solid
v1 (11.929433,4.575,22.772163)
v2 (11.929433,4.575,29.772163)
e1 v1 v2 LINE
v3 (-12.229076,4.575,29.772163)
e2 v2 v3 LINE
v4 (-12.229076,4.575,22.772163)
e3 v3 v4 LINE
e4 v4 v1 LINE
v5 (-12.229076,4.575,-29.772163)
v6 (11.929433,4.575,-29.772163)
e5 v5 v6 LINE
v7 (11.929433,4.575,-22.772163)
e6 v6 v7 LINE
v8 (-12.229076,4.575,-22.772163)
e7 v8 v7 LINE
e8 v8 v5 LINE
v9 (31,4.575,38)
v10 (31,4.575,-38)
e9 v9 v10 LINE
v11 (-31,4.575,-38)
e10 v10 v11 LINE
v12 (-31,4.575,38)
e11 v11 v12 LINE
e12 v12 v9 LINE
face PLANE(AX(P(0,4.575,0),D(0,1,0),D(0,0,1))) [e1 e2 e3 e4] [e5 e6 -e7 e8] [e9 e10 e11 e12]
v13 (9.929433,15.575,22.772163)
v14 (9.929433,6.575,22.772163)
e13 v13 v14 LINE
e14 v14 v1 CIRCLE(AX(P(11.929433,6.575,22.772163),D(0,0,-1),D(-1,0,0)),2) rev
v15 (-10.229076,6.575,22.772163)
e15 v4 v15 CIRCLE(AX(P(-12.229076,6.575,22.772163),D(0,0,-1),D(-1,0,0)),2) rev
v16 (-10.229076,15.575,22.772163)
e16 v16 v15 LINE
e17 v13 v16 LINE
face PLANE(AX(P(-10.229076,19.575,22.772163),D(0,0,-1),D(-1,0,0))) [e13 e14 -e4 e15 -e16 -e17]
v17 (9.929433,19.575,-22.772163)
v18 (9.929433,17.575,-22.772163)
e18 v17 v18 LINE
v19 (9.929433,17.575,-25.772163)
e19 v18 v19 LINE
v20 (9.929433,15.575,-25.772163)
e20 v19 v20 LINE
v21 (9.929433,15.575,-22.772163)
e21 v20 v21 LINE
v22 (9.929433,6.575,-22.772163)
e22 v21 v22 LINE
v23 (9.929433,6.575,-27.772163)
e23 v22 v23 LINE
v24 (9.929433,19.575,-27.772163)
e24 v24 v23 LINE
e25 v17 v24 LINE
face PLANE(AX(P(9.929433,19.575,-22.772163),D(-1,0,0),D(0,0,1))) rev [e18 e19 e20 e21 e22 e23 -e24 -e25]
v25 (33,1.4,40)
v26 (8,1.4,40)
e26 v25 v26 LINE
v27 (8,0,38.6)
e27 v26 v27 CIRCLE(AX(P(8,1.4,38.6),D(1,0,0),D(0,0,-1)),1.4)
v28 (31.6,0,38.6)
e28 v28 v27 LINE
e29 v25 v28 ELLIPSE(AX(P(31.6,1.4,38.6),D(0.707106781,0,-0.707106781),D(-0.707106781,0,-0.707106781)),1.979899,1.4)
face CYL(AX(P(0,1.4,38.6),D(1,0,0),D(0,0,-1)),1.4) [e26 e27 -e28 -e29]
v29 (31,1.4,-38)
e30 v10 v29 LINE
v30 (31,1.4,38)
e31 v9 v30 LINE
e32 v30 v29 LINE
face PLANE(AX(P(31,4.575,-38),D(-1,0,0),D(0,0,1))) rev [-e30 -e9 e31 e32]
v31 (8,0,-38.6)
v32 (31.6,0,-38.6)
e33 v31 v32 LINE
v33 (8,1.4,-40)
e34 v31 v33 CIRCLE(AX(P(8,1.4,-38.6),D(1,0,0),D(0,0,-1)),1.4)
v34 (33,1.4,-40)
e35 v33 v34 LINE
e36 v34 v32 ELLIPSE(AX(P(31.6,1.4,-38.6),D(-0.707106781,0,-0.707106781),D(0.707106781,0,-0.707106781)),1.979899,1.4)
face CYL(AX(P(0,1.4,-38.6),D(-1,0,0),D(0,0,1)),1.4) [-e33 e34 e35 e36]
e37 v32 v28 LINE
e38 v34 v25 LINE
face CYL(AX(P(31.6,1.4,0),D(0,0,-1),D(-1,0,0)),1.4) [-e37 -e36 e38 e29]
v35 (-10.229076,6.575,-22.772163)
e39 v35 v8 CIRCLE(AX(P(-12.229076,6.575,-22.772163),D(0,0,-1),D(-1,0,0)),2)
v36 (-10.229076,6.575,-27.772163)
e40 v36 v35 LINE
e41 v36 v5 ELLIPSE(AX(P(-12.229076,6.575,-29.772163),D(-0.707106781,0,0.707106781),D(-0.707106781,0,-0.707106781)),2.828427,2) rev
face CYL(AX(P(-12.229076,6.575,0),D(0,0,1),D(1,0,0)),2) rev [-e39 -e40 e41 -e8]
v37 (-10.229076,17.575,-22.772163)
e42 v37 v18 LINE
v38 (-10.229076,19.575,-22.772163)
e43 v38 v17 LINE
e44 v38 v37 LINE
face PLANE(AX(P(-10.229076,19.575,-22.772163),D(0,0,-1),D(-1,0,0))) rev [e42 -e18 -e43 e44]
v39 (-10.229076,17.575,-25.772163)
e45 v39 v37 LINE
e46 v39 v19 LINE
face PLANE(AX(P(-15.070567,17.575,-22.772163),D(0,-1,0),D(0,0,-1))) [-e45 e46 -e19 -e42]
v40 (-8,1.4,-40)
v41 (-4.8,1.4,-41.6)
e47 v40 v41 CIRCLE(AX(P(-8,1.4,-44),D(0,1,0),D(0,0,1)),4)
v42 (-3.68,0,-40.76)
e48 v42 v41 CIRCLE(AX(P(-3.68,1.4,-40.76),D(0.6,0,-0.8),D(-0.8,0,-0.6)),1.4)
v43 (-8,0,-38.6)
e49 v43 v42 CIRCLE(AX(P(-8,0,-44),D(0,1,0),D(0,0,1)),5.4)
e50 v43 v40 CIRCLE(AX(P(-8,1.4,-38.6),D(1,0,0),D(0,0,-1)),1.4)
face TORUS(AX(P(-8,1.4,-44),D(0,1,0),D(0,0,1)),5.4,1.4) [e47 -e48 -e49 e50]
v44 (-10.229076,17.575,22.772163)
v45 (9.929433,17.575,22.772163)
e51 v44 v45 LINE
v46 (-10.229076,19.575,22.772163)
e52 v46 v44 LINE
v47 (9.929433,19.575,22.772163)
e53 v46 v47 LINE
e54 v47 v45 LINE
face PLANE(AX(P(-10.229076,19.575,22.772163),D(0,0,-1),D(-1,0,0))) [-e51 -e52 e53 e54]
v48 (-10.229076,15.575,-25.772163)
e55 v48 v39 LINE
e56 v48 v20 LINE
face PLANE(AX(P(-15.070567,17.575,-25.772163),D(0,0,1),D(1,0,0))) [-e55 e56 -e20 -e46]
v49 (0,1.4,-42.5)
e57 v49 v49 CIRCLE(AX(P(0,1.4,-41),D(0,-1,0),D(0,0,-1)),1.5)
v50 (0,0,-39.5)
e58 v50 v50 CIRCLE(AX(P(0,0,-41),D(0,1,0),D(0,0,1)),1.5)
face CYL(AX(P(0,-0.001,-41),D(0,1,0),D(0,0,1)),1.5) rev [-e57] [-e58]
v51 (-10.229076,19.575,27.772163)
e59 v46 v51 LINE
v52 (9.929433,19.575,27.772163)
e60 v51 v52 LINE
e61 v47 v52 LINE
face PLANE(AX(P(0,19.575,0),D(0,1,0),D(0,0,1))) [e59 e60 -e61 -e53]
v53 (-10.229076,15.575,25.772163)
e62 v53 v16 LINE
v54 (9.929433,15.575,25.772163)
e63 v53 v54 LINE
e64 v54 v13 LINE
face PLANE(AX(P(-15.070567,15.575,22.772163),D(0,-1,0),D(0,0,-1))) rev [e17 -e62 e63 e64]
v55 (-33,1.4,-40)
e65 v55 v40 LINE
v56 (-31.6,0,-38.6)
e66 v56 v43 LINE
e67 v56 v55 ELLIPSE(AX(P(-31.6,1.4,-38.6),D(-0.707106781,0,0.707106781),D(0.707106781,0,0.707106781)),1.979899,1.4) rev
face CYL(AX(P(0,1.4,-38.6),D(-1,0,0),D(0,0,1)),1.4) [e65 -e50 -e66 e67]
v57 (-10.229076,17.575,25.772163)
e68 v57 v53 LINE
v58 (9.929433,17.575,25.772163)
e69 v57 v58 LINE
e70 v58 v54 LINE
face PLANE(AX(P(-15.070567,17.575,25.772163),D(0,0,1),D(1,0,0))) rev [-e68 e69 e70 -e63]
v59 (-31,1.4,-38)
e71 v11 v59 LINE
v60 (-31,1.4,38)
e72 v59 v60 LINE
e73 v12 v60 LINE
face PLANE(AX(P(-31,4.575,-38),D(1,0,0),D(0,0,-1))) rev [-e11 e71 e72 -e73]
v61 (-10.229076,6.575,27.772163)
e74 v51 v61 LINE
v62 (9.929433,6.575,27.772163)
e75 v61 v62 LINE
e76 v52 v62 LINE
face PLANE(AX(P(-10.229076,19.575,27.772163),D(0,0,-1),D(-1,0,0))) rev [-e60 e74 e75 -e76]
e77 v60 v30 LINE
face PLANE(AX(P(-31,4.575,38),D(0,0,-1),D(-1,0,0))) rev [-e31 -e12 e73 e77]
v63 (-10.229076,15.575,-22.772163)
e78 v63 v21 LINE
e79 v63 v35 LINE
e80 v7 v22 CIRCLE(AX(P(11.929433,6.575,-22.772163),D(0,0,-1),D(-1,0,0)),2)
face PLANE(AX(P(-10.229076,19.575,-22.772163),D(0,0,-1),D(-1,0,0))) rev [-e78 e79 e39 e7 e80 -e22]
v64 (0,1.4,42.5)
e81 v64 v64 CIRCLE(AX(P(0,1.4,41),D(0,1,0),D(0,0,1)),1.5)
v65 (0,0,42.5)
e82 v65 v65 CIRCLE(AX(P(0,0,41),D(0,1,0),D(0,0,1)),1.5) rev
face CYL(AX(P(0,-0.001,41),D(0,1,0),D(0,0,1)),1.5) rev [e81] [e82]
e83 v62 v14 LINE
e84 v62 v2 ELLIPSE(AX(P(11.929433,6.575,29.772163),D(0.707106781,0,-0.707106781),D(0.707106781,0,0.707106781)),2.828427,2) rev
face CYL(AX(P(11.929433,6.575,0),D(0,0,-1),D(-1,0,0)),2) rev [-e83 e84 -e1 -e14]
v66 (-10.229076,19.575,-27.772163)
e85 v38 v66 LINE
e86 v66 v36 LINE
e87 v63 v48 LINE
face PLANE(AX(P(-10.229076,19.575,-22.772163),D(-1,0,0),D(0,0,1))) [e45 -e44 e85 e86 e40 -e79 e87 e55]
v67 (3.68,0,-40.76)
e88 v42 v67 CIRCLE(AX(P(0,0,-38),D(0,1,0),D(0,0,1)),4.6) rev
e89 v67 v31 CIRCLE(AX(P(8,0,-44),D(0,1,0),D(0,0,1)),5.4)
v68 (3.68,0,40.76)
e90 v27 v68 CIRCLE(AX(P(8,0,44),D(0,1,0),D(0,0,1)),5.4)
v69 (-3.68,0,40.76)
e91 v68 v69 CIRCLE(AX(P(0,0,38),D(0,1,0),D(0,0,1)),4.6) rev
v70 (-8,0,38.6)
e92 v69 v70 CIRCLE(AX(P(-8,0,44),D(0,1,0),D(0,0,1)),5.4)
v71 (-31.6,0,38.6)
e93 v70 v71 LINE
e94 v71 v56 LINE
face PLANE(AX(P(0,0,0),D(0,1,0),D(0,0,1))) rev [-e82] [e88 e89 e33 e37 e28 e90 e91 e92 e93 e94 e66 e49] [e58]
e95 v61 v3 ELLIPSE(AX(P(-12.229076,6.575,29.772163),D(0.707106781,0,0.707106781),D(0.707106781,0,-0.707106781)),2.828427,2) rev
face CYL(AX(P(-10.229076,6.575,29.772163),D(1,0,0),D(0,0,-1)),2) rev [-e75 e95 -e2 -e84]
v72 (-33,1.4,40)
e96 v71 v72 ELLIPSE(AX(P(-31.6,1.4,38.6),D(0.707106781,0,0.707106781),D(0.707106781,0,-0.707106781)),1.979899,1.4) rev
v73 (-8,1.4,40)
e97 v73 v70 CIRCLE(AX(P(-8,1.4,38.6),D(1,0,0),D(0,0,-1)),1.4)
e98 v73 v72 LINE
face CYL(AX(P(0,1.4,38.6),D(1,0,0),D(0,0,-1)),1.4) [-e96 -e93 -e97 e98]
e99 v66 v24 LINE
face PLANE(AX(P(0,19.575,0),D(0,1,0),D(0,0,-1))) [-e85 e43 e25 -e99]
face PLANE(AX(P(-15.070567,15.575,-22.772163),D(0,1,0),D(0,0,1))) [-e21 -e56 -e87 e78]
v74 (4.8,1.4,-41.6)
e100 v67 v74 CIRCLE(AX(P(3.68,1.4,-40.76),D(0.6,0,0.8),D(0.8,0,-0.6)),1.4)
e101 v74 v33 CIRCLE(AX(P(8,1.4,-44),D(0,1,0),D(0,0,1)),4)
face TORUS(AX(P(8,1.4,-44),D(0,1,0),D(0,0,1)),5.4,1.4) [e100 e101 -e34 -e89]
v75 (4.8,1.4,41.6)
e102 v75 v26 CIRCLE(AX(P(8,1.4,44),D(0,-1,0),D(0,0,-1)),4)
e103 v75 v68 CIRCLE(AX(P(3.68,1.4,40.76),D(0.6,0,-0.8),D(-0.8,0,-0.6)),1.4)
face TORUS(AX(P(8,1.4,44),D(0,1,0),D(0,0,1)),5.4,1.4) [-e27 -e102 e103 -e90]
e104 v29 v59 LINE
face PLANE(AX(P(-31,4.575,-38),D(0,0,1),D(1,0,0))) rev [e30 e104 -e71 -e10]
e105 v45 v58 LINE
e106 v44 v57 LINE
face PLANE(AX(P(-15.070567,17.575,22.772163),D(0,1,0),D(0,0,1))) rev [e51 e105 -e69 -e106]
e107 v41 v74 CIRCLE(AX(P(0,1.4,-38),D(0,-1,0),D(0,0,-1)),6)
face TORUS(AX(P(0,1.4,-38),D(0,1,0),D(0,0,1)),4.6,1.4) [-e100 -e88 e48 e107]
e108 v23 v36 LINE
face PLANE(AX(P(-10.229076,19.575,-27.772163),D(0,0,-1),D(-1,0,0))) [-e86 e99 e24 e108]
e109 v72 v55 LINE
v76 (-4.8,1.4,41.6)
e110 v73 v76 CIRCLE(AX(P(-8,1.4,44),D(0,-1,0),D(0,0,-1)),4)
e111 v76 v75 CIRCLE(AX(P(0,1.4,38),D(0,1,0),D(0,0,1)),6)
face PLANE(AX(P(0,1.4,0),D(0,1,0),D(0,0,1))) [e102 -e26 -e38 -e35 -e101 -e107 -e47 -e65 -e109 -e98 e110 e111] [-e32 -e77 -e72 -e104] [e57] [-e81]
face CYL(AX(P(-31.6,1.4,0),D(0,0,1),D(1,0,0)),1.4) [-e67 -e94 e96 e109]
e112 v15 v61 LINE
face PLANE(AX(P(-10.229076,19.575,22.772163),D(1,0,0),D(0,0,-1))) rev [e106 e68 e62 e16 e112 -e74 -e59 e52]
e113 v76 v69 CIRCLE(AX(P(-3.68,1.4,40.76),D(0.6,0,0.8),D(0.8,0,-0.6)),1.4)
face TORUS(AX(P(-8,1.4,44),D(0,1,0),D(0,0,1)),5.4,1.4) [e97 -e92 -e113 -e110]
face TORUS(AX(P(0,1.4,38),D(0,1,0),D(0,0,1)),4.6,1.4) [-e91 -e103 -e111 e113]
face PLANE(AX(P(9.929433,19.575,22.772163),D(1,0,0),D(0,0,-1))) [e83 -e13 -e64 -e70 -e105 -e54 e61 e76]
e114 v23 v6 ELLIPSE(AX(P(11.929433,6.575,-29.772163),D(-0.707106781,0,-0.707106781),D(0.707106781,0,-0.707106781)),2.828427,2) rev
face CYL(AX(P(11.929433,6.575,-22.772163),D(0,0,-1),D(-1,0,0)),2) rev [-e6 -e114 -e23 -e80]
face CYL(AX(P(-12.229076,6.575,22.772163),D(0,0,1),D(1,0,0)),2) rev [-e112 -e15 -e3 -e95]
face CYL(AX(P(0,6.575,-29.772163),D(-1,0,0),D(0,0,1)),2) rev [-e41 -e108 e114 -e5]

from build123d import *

# Parameters (mm, degrees)
SKETCH1_W           = 62
SKETCH1_H           = 76
BOSS_EXTRUDE1_DEPTH = 4.575
SKETCH11_W          = 66
SKETCH11_H          = 80
BOSS_EXTRUDE5_DEPTH = 1.4
BOSS_EXTRUDE3_DEPTH = 1.4
CUT_EXTRUDE3_REACH  = 57.092
SKETCH12_R          = 1.5
FILLET1_R           = 1.4
SKETCH21_W          = 20.158508521
SKETCH21_H          = 5
BOSS_EXTRUDE8_DEPTH = 15
SKETCH33_W          = 3
SKETCH33_H          = 2
CUT_EXTRUDE7_DEPTH  = 25
FILLET2_R           = 2


with BuildPart() as part:
    # Sketch1 → Boss-Extrude1 (new body)
    with BuildSketch(Plane(origin=(0, 0, 0), x_dir=(1, 0, 0), z_dir=(0, 1, 0))):
        Rectangle(SKETCH1_W, SKETCH1_H)
    extrude(amount=BOSS_EXTRUDE1_DEPTH)

    # Sketch11 → Boss-Extrude5 (add)
    with BuildSketch(Plane(origin=(0, 0, 0), x_dir=(-1, 0, 0), z_dir=(0, -1, 0))):
        Rectangle(SKETCH11_W, SKETCH11_H)
    extrude(amount=-BOSS_EXTRUDE5_DEPTH)

    # Sketch4 → Boss-Extrude3 (add)
    with BuildSketch(Plane(origin=(0, 0, 0), x_dir=(1, 0, 0), z_dir=(0, 1, 0))):
        with BuildLine():
            Line((-8, -40), (8, -40))
            ThreePointArc((8, -40), (6.211145618, -40.422291236), (4.8, -41.6))
            ThreePointArc((4.8, -41.6), (0, -44), (-4.8, -41.6))
            ThreePointArc((-4.8, -41.6), (-6.211145618, -40.422291236), (-8, -40))
        make_face()
    boss_extrude3 = extrude(amount=BOSS_EXTRUDE3_DEPTH)

    # Sketch12 → Cut-Extrude3 (cut, up to next)
    with BuildSketch(Plane(origin=(0, 1.4, 0), x_dir=(1, 0, 0), z_dir=(0, 1, 0)), mode=Mode.PRIVATE) as cut_extrude3_sk1:
        with Locations(Location((0, -41, 0), (0, 0, 270))):
            Circle(SKETCH12_R)
    cut_extrude3_tool1 = extrude(cut_extrude3_sk1.sketch, amount=-CUT_EXTRUDE3_REACH, mode=Mode.PRIVATE) & part.part
    cut_extrude3 = cut_extrude3_tool1.solids().sort_by_distance((0, 1.4, 41))[0]
    add(cut_extrude3, mode=Mode.SUBTRACT)

    # Mirror1: Boss-Extrude3, Cut-Extrude3 across plane
    add(boss_extrude3.mirror(Plane.XY))
    add(cut_extrude3.mirror(Plane.XY), mode=Mode.SUBTRACT)

    # Fillet1
    fillet1_edges = [part.edges().sort_by_distance(p)[0] for p in [
        (20.5, 0, -40),
        (6.211145618, 0, -40.422291236),
        (0, 0, -44),
        (-6.211145618, 0, -40.422291236),
        (-20.5, 0, -40),
        (-33, 0, 0),
        (-20.5, 0, 40),
        (-6.211145618, 0, 40.422291236),
        (0, 0, 44),
        (6.211145618, 0, 40.422291236),
        (20.5, 0, 40),
        (33, 0, 0),
    ]]
    fillet(fillet1_edges, radius=FILLET1_R - 0.0001)  # a hair under: the kernel refuses the full size

    # Sketch21 → Boss-Extrude8 (add)
    with BuildSketch(Plane(origin=(0, 4.575, 0), x_dir=(1, 0, 0), z_dir=(0, 1, 0))):
        with Locations((-0.149821344, -25.272162816)):
            Rectangle(SKETCH21_W, SKETCH21_H)
    boss_extrude8 = extrude(amount=BOSS_EXTRUDE8_DEPTH)

    # Sketch33 → Cut-Extrude7 (cut)
    with BuildSketch(Plane(origin=(9.929432917, 0, 0), x_dir=(0, 0, -1), z_dir=(1, 0, 0))):
        with Locations((-24.272162816, 16.575)):
            Rectangle(SKETCH33_W, SKETCH33_H)
    cut_extrude7 = extrude(amount=-CUT_EXTRUDE7_DEPTH, mode=Mode.SUBTRACT)

    # Mirror2: Boss-Extrude8, Cut-Extrude7 across plane
    add(boss_extrude8.mirror(Plane.XY))
    add(cut_extrude7.mirror(Plane.XY), mode=Mode.SUBTRACT)

    # Fillet2
    fillet2_edges = [part.edges().sort_by_distance(p)[0] for p in [
        (-10.229075604, 4.575, 25.272162816),
        (-0.149821344, 4.575, 27.772162816),
        (9.929432917, 4.575, 25.272162816),
        (9.929432917, 4.575, -25.272162816),
        (-10.229075604, 4.575, -25.272162816),
        (-0.149821344, 4.575, -27.772162816),
    ]]
    fillet(fillet2_edges, radius=FILLET2_R)


solid = part.part
